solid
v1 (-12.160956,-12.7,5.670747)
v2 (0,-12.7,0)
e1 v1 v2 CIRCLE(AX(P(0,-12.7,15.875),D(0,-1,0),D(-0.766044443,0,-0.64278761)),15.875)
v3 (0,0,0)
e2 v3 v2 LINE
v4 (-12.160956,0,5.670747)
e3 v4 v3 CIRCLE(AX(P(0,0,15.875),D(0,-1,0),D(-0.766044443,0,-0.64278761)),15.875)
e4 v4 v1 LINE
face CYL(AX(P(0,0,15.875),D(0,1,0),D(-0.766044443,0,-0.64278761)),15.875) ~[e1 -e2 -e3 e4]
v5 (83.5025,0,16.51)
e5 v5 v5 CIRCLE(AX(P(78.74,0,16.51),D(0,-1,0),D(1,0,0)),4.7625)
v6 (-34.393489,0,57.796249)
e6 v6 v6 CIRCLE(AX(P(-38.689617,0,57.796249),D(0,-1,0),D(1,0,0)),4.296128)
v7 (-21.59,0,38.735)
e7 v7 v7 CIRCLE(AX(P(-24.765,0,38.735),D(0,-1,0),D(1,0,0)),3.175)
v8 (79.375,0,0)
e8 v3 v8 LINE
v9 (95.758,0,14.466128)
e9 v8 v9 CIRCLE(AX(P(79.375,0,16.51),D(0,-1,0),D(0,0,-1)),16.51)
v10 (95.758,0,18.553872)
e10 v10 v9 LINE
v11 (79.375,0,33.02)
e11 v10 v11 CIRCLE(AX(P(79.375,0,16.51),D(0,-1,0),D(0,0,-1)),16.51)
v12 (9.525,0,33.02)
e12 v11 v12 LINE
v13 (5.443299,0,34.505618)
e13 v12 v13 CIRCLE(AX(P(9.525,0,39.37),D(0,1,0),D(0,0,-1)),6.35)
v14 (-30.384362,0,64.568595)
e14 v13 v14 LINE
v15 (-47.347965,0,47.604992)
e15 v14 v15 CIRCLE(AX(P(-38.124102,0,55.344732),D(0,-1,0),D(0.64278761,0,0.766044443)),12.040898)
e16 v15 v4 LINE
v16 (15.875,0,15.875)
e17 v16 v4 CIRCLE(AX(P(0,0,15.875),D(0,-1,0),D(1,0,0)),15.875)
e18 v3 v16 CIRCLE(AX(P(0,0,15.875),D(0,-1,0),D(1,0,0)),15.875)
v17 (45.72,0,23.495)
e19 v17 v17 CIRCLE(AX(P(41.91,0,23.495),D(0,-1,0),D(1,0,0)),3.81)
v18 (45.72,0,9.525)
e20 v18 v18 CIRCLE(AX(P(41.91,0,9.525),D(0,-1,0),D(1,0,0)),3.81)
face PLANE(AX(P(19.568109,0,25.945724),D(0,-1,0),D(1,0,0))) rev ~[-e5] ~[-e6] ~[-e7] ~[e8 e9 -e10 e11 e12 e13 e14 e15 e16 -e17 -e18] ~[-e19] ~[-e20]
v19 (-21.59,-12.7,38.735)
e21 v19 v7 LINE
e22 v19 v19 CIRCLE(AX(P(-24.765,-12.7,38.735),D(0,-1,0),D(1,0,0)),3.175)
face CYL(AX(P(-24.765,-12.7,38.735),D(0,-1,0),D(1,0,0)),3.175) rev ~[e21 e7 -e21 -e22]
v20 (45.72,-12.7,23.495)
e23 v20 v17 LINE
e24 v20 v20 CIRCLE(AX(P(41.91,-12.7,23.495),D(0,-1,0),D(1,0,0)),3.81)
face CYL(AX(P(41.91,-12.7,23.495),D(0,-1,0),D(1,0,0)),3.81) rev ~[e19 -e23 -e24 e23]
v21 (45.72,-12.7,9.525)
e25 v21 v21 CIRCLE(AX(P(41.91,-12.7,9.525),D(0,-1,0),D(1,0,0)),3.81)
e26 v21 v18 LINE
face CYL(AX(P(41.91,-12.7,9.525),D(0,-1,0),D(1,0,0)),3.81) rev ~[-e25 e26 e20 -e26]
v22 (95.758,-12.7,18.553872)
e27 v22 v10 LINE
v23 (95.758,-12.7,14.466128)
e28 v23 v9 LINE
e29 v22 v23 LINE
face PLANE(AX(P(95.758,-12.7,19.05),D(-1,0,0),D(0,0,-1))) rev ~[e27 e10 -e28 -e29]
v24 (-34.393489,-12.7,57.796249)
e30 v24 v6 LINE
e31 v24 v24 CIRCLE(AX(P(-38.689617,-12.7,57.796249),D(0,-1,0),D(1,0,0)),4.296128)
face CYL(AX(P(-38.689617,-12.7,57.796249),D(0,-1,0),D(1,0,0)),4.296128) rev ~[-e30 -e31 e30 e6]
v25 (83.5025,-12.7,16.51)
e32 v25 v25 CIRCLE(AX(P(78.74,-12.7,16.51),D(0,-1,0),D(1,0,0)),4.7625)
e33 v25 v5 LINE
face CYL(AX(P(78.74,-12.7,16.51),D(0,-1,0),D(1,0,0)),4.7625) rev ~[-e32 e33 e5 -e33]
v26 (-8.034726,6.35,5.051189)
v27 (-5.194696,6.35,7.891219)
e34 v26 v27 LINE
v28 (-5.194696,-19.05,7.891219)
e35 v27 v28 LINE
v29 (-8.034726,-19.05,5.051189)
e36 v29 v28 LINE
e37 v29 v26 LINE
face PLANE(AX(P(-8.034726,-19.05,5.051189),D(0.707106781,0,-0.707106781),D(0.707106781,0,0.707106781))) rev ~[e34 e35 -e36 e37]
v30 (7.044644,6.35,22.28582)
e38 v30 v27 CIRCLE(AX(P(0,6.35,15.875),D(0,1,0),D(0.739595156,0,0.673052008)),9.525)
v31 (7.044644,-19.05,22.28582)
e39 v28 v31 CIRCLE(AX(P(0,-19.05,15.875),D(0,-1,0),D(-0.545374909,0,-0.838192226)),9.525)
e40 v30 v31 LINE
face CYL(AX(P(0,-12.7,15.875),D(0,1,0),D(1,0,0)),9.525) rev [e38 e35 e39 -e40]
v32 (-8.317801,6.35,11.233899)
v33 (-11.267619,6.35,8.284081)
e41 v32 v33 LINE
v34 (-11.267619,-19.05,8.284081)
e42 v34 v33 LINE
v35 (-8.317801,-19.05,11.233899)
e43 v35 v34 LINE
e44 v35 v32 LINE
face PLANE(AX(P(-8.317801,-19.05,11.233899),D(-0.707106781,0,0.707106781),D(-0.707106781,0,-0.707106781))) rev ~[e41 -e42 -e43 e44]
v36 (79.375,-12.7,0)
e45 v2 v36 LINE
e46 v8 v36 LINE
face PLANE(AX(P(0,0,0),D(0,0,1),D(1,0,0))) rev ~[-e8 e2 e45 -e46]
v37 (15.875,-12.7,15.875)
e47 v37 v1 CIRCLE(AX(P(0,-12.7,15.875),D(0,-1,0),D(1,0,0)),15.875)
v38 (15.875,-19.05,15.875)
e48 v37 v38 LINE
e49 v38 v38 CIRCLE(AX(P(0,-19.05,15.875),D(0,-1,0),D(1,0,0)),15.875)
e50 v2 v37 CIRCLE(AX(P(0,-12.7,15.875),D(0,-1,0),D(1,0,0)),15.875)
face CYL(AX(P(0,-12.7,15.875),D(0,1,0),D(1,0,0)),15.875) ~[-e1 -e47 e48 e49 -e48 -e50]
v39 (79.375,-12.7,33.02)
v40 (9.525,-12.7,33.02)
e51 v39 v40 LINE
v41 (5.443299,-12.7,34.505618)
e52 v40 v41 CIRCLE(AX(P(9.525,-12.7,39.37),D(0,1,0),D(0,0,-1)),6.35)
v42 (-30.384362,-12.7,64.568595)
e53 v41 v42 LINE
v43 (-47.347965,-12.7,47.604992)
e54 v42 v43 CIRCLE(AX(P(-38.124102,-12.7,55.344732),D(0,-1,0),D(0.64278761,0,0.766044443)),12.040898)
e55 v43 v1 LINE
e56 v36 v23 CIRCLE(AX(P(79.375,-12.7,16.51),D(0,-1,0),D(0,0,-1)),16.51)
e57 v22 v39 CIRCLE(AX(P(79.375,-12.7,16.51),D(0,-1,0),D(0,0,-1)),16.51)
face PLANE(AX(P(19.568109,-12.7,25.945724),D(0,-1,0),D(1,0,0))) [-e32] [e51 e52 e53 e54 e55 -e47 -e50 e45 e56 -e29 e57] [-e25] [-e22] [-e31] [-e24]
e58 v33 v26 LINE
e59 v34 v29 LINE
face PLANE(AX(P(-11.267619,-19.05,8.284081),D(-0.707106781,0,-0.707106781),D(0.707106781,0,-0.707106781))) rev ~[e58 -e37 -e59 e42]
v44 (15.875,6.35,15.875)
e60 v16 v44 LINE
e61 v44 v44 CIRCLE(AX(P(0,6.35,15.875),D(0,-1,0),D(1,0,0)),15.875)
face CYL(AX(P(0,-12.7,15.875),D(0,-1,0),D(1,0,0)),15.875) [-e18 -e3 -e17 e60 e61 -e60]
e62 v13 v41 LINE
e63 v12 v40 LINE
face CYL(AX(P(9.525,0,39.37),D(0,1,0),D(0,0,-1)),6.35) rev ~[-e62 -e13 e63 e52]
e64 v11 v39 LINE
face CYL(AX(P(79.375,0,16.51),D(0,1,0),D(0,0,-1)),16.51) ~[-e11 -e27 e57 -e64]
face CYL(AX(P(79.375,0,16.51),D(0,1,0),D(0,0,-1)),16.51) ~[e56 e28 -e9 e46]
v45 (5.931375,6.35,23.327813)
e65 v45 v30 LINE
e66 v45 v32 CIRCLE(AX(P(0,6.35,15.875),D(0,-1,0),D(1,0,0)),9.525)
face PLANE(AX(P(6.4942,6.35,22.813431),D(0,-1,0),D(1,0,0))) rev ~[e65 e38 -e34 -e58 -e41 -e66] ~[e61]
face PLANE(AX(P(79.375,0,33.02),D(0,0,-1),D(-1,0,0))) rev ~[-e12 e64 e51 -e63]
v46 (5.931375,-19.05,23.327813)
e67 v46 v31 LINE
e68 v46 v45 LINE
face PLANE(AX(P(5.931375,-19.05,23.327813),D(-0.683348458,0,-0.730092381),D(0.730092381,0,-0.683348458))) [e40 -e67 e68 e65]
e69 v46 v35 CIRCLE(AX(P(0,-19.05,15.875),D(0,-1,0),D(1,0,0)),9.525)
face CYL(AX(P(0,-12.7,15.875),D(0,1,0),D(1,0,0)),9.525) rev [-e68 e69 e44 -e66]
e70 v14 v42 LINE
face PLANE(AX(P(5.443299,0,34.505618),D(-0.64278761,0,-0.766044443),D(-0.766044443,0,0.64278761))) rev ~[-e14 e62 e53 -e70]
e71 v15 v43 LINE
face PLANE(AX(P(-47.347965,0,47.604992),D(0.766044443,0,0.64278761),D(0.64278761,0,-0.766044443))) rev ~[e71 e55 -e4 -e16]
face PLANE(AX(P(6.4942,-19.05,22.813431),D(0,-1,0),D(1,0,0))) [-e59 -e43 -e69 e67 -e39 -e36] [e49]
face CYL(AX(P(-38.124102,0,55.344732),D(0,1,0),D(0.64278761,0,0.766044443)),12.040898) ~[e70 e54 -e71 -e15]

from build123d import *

# Parameters (mm, degrees)
F1_DEPTH      = 12.7
F2_R          = 15.875
F2_R_2        = 9.525
F3_DEPTH      = 6.35
F3_DEPTH_BACK = 19.05
F4_R          = 9.525
F5_DEPTH      = 25.4
F7_DEPTH      = 25.401
F8_R          = 4.7625
F8_R_2        = 3.81
F8_R_3        = 3.175
F8_R_4        = 4.2961277226
F9_DEPTH      = 19.051
F12_DEPTH     = 19.051
F14_DEPTH     = 25.4


# Not quite as in the source:
# - after a boolean that leaves OpenCascade's solid faulty, fix() repairs it


with BuildPart() as f1:
    # F0 (on Front) → F1 (new body)
    with BuildSketch(Plane.XZ):
        with BuildLine():
            ThreePointArc((-12.1609555345, 5.6707466962), (-6.7090649051, 1.4873638808), (0, 0))
            Line((0, 0), (79.375, 0))
            ThreePointArc((79.375, 0), (95.885, 16.51), (79.375, 33.02))
            Line((79.375, 33.02), (9.525, 33.02))
            ThreePointArc((9.525, 33.02), (7.3531720899, 33.402951858), (5.4432986785, 34.5056177862))
            Line((5.4432986785, 34.5056177862), (-30.3843620081, 64.5685946542))
            ThreePointArc((-30.3843620081, 64.5685946542), (-46.6383026366, 63.8589322804), (-47.3479650105, 47.6049916518))
            Line((-47.3479650105, 47.6049916518), (-12.1609555345, 5.6707466962))
        make_face()
    extrude(amount=F1_DEPTH)

    # F2 (on face) → F3 (join, two sides)
    with BuildSketch(Plane.XZ.offset(12.7)) as f3_sk:
        with Locations((0, 15.875)):
            Circle(F2_R)
        with Locations((0, 15.875)):
            Circle(F2_R_2, mode=Mode.SUBTRACT)
    extrude(amount=F3_DEPTH)
    extrude(f3_sk.sketch, amount=-F3_DEPTH_BACK)

    add(f1.part.fix(), mode=Mode.REPLACE)

    # F4 (on face) → F5 (cut)
    with BuildSketch(Plane.XZ.offset(12.7)):
        with Locations((0, 15.875)):
            Circle(F4_R)
    extrude(amount=-F5_DEPTH, mode=Mode.SUBTRACT)

    # F6 (on face) → F7 (cut, through all)
    with BuildSketch(Plane.XZ.offset(19.05)):
        with BuildLine():
            Line((-8.3178005381, 11.2338989228), (-11.2676186575, 8.2840808033))
            Line((-11.2676186575, 8.2840808033), (-8.034726454, 5.0511885997))
            Line((-8.034726454, 5.0511885997), (-5.1946960102, 7.8912190435))
            ThreePointArc((-5.1946960102, 7.8912190435), (-6.959904305, 9.3722807946), (-8.3178005381, 11.2338989228))
        make_face()
    extrude(amount=-F7_DEPTH, mode=Mode.SUBTRACT)

    # F8 (on face) → F9 (cut, through all)
    with BuildSketch(Plane.XZ.offset(12.7)):
        with Locations((78.74, 16.51)):
            Circle(F8_R)
        with Locations((41.91, 23.495)):
            Circle(F8_R_2)
        with Locations((41.91, 9.525)):
            Circle(F8_R_2)
        with Locations((-24.765, 38.735)):
            Circle(F8_R_3)
        with Locations((-38.6896171983, 57.7962485902)):
            Circle(F8_R_4)
    extrude(amount=-F9_DEPTH, mode=Mode.SUBTRACT)

    # F11 (on face) → F12 (cut, through all)
    with BuildSketch(Plane.XZ.offset(12.7)):
        with BuildLine():
            Line((95.758, 18.5538715713), (95.758, 14.4661284287))
            ThreePointArc((95.758, 14.4661284287), (95.885, 16.51), (95.758, 18.5538715713))
        make_face()
        with BuildLine():
            ThreePointArc((95.758, 18.5538715713), (95.885, 16.51), (95.758, 14.4661284287))
            Line((95.758, 14.4661284287), (95.758, 13.97))
            Line((95.758, 13.97), (97.3146509769, 13.97))
            Line((97.3146509769, 13.97), (97.3146509769, 19.05))
            Line((97.3146509769, 19.05), (95.758, 19.05))
            Line((95.758, 19.05), (95.758, 18.5538715713))
        make_face()
    extrude(amount=-F12_DEPTH, mode=Mode.SUBTRACT)

    # F13 (on face) → F14 (join)
    with BuildSketch(Plane.XZ.offset(19.05)):
        with BuildLine():
            Line((5.9313747803, 23.3278127721), (7.0446438565, 22.2858203792))
            ThreePointArc((7.0446438565, 22.2858203792), (6.5088940652, 22.8291299274), (5.9313747803, 23.3278127721))
        make_face()
    extrude(amount=-F14_DEPTH)


solid = f1.part
